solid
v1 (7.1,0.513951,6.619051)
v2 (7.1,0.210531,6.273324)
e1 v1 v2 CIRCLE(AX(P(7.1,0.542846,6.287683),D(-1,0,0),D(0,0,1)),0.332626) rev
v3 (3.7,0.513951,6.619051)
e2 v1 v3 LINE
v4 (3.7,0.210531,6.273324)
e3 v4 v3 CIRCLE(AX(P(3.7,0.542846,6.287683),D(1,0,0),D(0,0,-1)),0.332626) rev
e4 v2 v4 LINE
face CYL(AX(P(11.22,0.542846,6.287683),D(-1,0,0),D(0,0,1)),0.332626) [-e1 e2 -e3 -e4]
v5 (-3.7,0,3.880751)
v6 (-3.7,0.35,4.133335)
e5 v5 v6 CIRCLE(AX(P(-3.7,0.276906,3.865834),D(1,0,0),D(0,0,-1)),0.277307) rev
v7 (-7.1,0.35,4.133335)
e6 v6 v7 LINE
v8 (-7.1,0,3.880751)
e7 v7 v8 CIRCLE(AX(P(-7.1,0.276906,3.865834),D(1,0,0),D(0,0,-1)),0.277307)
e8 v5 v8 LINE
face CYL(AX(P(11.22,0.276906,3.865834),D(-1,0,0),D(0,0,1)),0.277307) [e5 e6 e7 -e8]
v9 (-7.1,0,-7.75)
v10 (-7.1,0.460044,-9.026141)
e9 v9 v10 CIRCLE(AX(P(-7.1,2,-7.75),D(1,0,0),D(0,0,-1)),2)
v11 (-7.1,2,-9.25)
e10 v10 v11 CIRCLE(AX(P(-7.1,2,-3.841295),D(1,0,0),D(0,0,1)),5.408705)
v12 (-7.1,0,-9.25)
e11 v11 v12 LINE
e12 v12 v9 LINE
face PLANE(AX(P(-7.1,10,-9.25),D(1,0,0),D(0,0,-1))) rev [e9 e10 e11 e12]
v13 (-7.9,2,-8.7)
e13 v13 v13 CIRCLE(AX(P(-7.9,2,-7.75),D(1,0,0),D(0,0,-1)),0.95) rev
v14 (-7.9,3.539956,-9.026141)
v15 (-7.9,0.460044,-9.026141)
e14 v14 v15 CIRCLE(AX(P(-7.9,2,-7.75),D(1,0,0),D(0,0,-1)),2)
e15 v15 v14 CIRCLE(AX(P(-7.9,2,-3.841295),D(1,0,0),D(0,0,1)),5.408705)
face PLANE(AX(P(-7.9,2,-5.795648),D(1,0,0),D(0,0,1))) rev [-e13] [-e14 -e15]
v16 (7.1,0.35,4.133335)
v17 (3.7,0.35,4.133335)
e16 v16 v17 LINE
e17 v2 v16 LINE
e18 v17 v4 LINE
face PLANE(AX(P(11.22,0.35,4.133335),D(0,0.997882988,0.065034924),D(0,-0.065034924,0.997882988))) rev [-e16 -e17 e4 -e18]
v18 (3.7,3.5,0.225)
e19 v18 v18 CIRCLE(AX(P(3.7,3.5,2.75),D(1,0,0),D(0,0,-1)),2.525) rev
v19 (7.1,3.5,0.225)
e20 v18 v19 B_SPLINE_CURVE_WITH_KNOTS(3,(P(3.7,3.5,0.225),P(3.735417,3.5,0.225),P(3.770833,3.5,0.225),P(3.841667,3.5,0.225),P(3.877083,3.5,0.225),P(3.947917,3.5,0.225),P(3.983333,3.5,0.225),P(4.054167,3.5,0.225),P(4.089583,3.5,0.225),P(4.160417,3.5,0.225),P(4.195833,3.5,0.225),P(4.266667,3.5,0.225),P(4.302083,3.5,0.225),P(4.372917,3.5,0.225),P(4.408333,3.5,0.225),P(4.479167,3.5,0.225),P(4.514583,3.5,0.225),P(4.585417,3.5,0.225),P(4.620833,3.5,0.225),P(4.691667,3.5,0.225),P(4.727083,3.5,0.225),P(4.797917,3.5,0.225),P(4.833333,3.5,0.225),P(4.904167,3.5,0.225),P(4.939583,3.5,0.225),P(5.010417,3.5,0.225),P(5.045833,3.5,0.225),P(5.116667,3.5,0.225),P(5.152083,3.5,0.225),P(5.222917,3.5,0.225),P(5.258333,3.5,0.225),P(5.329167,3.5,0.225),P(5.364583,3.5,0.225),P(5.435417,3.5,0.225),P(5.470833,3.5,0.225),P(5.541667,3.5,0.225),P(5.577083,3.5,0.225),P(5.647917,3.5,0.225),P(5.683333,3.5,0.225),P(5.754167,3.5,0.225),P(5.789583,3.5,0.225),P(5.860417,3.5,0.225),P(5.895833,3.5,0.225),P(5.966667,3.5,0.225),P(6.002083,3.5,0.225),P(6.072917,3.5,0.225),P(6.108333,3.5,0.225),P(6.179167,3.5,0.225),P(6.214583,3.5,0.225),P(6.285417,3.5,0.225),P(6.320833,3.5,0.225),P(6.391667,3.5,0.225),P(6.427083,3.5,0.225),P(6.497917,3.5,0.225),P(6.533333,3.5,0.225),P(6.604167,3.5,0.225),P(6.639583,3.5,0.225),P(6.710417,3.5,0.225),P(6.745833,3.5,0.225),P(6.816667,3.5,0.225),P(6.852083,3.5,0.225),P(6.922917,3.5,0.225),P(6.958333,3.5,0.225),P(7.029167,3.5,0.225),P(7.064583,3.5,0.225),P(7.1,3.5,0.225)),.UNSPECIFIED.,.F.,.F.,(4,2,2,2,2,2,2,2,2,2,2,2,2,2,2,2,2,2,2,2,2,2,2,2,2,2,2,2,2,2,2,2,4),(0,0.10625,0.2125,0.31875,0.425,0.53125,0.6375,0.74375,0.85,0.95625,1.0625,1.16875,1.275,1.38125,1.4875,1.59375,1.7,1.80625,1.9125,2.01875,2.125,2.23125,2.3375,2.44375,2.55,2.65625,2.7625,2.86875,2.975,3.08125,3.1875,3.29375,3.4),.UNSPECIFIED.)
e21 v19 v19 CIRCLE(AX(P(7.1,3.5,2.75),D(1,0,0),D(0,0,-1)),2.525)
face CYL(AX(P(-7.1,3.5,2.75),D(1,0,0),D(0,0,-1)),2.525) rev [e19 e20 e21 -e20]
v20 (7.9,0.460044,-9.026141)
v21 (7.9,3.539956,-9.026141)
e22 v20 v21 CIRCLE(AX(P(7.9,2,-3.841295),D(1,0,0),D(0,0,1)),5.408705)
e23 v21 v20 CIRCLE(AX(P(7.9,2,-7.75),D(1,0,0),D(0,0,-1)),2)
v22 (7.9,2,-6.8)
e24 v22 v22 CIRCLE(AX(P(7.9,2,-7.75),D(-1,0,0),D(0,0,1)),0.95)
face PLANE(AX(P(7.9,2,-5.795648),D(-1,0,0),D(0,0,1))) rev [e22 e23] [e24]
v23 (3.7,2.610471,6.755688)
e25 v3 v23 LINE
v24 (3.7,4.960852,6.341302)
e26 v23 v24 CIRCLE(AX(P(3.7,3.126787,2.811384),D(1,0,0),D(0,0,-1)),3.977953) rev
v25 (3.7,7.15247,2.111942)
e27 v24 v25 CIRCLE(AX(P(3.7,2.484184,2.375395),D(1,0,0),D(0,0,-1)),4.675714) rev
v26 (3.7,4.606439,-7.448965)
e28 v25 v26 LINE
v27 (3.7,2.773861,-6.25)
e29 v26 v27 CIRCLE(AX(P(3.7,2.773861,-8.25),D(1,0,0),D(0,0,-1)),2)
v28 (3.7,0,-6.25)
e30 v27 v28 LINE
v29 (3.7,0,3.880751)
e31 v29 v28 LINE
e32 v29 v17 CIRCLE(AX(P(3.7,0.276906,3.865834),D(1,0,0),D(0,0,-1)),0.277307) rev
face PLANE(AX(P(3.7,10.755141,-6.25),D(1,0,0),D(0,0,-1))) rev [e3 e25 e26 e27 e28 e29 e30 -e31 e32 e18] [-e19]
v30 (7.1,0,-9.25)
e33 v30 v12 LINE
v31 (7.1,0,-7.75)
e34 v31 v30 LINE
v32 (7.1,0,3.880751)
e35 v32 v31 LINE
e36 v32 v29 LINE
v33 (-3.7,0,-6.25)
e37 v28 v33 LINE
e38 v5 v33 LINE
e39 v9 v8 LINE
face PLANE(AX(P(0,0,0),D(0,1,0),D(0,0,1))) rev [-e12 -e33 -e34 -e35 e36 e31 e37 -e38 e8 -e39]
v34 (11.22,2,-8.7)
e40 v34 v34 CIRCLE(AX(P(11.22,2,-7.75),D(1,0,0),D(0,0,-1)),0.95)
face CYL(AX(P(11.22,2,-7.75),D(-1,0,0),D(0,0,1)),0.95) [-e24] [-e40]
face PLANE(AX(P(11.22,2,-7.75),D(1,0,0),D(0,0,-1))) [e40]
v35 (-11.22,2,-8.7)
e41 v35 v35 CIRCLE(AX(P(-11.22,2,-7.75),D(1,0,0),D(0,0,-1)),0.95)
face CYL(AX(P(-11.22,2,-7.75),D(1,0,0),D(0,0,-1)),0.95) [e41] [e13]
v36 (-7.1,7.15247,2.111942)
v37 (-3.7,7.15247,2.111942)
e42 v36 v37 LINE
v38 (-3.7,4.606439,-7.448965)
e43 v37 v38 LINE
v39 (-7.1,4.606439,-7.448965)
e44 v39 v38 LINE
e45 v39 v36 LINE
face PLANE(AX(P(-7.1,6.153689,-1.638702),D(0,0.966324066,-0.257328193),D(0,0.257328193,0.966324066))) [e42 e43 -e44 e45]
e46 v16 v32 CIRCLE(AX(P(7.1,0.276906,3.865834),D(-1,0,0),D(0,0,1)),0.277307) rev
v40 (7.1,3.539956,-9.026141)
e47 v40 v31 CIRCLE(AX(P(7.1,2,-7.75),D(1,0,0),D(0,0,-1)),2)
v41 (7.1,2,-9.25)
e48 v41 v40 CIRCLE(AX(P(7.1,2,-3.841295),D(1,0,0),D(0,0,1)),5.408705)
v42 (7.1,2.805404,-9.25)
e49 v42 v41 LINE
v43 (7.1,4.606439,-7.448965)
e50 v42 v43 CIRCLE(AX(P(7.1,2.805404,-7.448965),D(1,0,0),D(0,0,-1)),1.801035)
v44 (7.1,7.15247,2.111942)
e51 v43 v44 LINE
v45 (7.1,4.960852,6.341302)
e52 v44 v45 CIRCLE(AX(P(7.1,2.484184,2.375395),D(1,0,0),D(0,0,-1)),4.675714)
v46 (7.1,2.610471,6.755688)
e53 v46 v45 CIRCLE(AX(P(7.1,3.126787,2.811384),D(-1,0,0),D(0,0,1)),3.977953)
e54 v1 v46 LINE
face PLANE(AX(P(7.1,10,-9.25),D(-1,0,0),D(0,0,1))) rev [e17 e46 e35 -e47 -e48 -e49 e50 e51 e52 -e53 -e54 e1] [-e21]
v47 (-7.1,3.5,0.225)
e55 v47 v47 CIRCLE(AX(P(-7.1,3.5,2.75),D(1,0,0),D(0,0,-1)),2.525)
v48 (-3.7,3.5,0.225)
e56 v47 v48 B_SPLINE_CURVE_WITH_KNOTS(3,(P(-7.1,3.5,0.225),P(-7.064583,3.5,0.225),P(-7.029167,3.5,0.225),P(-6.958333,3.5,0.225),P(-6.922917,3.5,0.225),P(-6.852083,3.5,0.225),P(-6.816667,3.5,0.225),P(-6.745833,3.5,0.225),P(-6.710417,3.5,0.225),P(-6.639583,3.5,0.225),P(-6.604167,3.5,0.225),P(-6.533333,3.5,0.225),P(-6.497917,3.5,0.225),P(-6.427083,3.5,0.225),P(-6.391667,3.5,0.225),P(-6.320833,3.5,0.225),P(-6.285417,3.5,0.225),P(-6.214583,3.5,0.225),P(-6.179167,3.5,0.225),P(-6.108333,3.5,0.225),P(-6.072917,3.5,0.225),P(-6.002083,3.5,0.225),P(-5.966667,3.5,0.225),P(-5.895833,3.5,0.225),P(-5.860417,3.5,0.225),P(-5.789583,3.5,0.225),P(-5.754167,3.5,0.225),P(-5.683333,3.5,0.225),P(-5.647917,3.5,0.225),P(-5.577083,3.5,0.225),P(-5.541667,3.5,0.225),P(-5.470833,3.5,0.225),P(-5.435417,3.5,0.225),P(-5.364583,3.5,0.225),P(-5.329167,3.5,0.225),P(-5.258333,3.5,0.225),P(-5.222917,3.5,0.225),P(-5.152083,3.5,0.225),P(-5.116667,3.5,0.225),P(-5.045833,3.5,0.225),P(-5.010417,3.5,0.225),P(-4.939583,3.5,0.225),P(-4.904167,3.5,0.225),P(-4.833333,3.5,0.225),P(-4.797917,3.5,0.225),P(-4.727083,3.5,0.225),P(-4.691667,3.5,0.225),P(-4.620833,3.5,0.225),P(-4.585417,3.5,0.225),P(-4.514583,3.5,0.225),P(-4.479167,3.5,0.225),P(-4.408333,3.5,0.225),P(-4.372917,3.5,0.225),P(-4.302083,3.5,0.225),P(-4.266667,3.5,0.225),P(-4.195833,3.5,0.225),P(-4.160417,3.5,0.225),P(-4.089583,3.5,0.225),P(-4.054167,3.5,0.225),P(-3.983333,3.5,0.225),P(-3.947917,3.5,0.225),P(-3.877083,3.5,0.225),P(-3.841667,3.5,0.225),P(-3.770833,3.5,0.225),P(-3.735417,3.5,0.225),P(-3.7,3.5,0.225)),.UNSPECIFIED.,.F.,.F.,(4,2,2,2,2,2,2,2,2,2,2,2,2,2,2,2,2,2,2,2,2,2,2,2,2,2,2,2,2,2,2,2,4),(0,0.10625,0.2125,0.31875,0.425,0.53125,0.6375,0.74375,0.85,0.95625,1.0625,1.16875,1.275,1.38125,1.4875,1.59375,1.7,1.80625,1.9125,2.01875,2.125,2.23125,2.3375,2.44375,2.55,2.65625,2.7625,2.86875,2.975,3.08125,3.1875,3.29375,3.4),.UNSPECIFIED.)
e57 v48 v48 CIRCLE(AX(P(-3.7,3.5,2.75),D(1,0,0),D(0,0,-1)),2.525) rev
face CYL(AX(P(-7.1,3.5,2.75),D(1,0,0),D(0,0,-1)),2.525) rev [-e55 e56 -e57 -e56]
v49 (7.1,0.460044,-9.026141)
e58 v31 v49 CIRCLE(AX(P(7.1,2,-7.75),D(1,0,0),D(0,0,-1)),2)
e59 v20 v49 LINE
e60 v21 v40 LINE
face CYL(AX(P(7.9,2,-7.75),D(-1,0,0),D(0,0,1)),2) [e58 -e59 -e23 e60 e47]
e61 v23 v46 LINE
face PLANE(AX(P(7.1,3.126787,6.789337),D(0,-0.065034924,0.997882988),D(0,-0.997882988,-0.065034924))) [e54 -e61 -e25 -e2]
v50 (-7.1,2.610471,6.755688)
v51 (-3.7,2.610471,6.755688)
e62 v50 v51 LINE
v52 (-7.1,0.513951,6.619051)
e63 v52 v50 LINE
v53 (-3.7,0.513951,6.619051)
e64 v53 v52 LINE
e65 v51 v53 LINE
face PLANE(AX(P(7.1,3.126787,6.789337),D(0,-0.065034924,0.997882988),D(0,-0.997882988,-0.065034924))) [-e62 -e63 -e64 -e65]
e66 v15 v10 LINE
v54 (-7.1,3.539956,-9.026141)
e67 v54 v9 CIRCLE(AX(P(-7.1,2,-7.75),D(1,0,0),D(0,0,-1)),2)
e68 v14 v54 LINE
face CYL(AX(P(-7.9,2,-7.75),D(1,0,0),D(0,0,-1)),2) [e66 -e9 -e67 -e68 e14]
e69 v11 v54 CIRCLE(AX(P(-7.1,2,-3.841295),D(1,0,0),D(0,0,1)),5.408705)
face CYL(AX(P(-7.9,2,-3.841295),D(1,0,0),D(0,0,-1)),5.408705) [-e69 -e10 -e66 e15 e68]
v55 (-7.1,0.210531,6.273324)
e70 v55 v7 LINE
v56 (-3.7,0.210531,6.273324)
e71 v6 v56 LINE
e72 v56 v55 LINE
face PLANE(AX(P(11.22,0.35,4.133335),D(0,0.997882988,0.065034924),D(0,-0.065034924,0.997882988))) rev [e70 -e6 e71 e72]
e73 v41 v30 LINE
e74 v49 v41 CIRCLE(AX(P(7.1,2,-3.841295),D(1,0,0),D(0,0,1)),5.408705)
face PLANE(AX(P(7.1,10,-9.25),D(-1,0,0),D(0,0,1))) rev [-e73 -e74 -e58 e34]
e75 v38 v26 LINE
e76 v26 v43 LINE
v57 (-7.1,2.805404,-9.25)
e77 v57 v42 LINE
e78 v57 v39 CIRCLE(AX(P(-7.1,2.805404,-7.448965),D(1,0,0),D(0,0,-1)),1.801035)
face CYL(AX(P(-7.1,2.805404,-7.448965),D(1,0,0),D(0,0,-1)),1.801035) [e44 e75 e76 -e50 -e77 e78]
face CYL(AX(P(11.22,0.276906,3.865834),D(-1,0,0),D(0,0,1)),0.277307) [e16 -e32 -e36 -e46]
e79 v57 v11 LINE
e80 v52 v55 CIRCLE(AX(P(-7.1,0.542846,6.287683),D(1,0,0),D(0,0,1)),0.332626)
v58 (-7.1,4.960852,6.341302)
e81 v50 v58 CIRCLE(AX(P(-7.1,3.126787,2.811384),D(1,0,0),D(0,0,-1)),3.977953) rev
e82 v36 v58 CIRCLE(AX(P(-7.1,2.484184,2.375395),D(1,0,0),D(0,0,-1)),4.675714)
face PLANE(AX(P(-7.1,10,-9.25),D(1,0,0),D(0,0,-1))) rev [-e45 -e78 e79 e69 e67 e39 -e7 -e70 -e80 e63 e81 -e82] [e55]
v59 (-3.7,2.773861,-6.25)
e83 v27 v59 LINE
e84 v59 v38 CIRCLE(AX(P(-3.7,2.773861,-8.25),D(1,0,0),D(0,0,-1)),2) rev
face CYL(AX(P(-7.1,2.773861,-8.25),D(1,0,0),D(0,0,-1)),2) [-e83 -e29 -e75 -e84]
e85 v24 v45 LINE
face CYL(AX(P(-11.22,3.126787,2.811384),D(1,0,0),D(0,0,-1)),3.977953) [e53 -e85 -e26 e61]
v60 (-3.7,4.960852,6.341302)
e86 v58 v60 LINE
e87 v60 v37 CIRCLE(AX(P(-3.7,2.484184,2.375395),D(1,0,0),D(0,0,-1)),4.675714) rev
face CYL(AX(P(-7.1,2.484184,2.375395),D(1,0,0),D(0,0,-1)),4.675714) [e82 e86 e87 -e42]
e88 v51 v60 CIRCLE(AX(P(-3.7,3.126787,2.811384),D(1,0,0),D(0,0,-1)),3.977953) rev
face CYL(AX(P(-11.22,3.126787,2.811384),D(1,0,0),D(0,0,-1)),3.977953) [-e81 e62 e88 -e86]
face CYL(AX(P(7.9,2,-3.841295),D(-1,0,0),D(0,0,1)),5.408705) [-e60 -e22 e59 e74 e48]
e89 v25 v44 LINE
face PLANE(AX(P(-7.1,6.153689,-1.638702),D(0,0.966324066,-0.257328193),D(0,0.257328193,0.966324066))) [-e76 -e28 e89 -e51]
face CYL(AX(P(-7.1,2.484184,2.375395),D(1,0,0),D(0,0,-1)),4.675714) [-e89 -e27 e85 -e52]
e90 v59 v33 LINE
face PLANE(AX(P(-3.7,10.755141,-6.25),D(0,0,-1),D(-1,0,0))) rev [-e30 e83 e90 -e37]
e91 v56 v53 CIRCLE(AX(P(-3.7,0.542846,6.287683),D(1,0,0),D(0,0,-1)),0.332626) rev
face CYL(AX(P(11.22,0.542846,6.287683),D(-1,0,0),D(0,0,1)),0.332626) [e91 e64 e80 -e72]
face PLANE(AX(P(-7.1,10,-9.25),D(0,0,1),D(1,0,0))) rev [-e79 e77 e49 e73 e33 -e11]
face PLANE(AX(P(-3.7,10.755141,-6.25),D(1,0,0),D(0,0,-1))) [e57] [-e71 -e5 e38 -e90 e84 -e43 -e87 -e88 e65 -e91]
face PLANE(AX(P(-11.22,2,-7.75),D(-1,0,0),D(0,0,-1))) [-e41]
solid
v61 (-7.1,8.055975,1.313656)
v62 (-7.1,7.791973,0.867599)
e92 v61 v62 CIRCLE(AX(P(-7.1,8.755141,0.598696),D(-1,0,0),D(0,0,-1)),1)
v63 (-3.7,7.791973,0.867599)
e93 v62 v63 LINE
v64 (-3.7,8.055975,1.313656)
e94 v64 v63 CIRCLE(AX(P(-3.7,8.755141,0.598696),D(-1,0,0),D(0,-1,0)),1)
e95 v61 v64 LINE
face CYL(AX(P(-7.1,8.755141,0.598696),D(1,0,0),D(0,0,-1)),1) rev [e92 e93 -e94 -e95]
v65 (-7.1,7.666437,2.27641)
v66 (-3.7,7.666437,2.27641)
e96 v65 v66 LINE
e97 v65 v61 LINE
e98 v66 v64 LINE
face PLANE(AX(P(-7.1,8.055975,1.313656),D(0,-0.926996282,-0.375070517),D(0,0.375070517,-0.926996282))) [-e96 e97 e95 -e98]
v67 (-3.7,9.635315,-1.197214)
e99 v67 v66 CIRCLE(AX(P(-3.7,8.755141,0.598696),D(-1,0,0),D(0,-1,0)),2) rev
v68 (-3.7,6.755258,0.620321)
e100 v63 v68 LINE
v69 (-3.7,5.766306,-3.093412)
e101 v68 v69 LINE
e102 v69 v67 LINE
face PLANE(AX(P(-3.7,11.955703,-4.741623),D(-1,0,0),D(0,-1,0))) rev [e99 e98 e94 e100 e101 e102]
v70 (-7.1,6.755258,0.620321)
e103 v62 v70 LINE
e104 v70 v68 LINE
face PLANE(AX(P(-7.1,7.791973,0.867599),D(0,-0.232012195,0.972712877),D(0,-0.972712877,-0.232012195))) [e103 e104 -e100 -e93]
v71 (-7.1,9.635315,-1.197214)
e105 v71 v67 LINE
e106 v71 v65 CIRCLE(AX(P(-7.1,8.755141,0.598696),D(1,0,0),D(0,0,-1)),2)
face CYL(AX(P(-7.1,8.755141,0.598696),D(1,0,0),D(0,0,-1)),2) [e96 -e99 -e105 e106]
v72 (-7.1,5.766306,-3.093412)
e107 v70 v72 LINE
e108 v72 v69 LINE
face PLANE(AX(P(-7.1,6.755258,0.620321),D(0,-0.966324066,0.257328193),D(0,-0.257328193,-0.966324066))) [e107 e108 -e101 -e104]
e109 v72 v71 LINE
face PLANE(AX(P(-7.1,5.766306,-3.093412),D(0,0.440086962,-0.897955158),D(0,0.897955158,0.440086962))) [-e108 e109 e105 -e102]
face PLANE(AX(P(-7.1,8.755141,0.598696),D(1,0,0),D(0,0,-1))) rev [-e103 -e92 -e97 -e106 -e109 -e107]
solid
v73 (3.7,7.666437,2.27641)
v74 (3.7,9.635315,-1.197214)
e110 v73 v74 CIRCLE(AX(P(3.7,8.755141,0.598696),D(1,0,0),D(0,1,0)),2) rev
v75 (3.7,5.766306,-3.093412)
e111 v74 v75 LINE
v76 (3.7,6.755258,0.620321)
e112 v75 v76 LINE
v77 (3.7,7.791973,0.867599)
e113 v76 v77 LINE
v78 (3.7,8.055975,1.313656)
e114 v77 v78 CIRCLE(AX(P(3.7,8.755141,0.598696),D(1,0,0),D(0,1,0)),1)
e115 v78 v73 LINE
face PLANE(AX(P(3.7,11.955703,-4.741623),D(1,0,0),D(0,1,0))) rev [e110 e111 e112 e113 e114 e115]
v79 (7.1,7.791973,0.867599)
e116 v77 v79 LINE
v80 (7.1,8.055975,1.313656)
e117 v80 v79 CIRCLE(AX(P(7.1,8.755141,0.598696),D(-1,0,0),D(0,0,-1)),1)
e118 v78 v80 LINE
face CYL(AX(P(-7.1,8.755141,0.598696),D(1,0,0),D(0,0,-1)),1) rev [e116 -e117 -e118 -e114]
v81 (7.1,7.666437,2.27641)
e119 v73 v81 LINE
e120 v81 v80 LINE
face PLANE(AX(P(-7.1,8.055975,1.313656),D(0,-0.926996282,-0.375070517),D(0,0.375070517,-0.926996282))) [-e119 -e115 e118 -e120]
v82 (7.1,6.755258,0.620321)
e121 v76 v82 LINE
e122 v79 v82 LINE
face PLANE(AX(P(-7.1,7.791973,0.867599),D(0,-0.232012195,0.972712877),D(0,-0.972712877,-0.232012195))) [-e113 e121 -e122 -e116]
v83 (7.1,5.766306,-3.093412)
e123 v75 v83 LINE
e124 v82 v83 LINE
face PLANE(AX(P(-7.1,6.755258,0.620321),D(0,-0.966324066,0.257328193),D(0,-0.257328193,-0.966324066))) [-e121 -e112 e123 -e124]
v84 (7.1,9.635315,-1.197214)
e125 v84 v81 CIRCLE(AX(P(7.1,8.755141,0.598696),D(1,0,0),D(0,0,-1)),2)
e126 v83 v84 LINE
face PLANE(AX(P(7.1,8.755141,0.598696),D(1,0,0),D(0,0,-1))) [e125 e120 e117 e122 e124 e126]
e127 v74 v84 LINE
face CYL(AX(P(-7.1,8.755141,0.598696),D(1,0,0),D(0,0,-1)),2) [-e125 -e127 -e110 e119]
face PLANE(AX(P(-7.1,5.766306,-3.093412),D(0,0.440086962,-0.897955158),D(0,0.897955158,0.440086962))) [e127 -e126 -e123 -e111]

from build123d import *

# Parameters (mm, degrees)
SKETCH_3_W               = 14.2
SKETCH_3_H               = 18.5
EXTRUDE_1_DEPTH          = 10
SKETCH_5_R               = 2.525
CUT_EXTRUDE_3_DEPTH      = 20.677461727
SKETCH_5_6_R             = 0.95
EXTRUDE_2_DEPTH          = 4.12
EXTRUDE_3_DEPTH          = 14.2
CUT_EXTRUDE_6_DEPTH      = 19.086568265
CUT_EXTRUDE_6_DEPTH_BACK = 19.086568265
SKETCH_14_W              = 7.4
SKETCH_14_H              = 15.203667289
EXTRUDE_4_DEPTH          = 0.8
FILLET_1_R               = 2
CUT_EXTRUDE_16_DEPTH     = 24.17019533
SKETCH_31_W              = 7.4
SKETCH_31_H              = 10.622526497
CUT_EXTRUDE_17_DEPTH     = 16.468325908
CUT_EXTRUDE_19_DEPTH     = 24.17019533
EXTRUDE_7_DEPTH          = 14.2
SKETCH_36_W              = 7.4
SKETCH_36_H              = 2.688606207
CUT_EXTRUDE_20_DEPTH     = 18.747756854
CUT_EXTRUDE_21_DEPTH     = 24.17019533


with BuildPart() as part:
    # 草图3 → 凸台-拉伸1 (new body)
    with BuildSketch(Plane(origin=(0, 0, 0), x_dir=(1, 0, 0), z_dir=(0, 1, 0))):
        Rectangle(SKETCH_3_W, SKETCH_3_H)
    extrude(amount=EXTRUDE_1_DEPTH)

    # 草图5 → 切除-拉伸3 (cut, through all)
    with BuildSketch(Plane(origin=(7.1, 0, 0), x_dir=(0, 0, -1), z_dir=(1, 0, 0))):
        with BuildLine():
            Line((-9.25, 10), (-9.25, 0))
            Line((-9.25, 0), (-6.336598232, 0))
            ThreePointArc((-6.336598232, 0), (-6.401285502, 4.862104509), (-2.111941752, 7.152470177))
            Line((-2.111941752, 7.152470177), (0.590375146, 6.432854109))
            Line((0.590375146, 6.432854109), (7.448964751, 4.606439417))
            ThreePointArc((7.448964751, 4.606439417), (8.722488989, 4.078928406), (9.25, 2.805404168))
            Line((9.25, 2.805404168), (9.25, 10))
            Line((9.25, 10), (-9.25, 10))
        make_face()
        with Locations((-2.75, 3.5)):
            Circle(SKETCH_5_R)
    extrude(amount=-CUT_EXTRUDE_3_DEPTH, mode=Mode.SUBTRACT)

    # 草图5<6> → 凸台-拉伸2 (add)
    with BuildSketch(Plane(origin=(7.1, 0, 0), x_dir=(0, 0, -1), z_dir=(1, 0, 0))):
        with Locations(Location((7.75, 2, 0), (0, 0, 180))):
            Circle(SKETCH_5_6_R)
    extrude_2 = extrude(amount=EXTRUDE_2_DEPTH)

    # 镜向1: 凸台-拉伸2 across plane
    add(extrude_2.mirror(Plane(origin=(0, 0, 0), x_dir=(0, 0, 1), z_dir=(1, 0, 0))))

    # 草图14 → 切除-拉伸6 (cut, two sides: drawn at the far end of the back side and taken through both)
    with BuildSketch(Plane.XZ.offset(-CUT_EXTRUDE_6_DEPTH_BACK)):
        with Locations((0, 1.351833645)):
            Rectangle(SKETCH_14_W, SKETCH_14_H)
    extrude(amount=CUT_EXTRUDE_6_DEPTH + CUT_EXTRUDE_6_DEPTH_BACK, mode=Mode.SUBTRACT)

    # 草图20 → 凸台-拉伸4 (add)
    with BuildSketch(Plane(origin=(7.1, 0, 0), x_dir=(0, 0, -1), z_dir=(1, 0, 0))):
        with BuildLine():
            ThreePointArc((9.02614068, 3.539956157), (5.75, 2), (9.02614068, 0.460043843))
            ThreePointArc((9.02614068, 0.460043843), (9.25, 2), (9.02614068, 3.539956157))
        make_face()
    extrude_4 = extrude(amount=EXTRUDE_4_DEPTH)

    # 镜向2: 凸台-拉伸4 across plane
    add(extrude_4.mirror(Plane(origin=(0, 0, 0), x_dir=(0, 0, 1), z_dir=(1, 0, 0))))

    # 圆角1
    # the kernel refuses this fillet: 2 mm, written as the material it takes off along each edge
    with BuildSketch(Plane(origin=(3.7, 4.925718884, -6.25), x_dir=(0, -1, 0), z_dir=(-1, 0, 0))) as fillet_1_piece_1:
        with BuildLine():
            CenterArc((2.151857578, -2), FILLET_1_R, 90, 66.389458329)
            Line((0.319279467, -1.198964751), (0.282627905, -1.182944046))
            ThreePointArc((0.282627905, -1.182944046), (0.120986771, -0.609775503), (-0.038652963, -0.010293128))
            Line((-0.038652963, -0.010293128), (0, 0.04))
            Line((0, 0.04), (2.151857578, 0.04))
            Line((2.151857578, 0.04), (2.151857578, 0))
        make_face()
    extrude(amount=7.4, mode=Mode.SUBTRACT)

    # 草图28 → 切除-拉伸16 (cut, through all)
    with BuildSketch(Plane.ZY.offset(7.1)):
        with BuildLine():
            Line((4.133334805, 0.35), (6.998120333, 0.163293632))
            Line((6.998120333, 0.163293632), (6.998120333, 0))
            Line((6.998120333, 0), (3.880750582, 0))
            ThreePointArc((3.880750582, 0), (4.090700414, 0.114626799), (4.133334805, 0.35))
        make_face()
    extrude(amount=-CUT_EXTRUDE_16_DEPTH, mode=Mode.SUBTRACT)

    # 草图33 → 切除-拉伸19 (cut, through all)
    with BuildSketch(Plane(origin=(7.1, 0, 0), x_dir=(0, 0, -1), z_dir=(1, 0, 0))):
        with BuildLine():
            Line((-6.341301644, 4.960852087), (-7.680928531, 4.960852087))
            Line((-7.680928531, 4.960852087), (-7.680928531, 0))
            Line((-7.680928531, 0), (-5.565727569, 0.256646816))
            ThreePointArc((-5.565727569, 0.256646816), (-6.736351761, 2.479684462), (-6.341301644, 4.960852087))
        make_face()
    extrude(amount=-CUT_EXTRUDE_19_DEPTH, mode=Mode.SUBTRACT)

    # 草图35 → 凸台-拉伸7 (add)
    with BuildSketch(Plane.ZY.offset(7.1)):
        Polygon((6.59789795, 0.189377283), (5.565727569, 0.256646816), (6.789337446, 3.126786976), align=None)
    extrude(amount=-EXTRUDE_7_DEPTH)

    # 草图36 → 切除-拉伸20 (cut, through all)
    with BuildSketch(Plane(origin=(0, 0.616761699, 0.040196146), x_dir=(1, 0, 0), z_dir=(0, -0.9978829884707797, -0.06503492385346464))):
        with Locations((0, 6.881556957)):
            Rectangle(SKETCH_36_W, SKETCH_36_H)
    extrude(amount=-CUT_EXTRUDE_20_DEPTH, mode=Mode.SUBTRACT)

    # 草图38 → 切除-拉伸21 (cut, through all)
    with BuildSketch(Plane.ZY.offset(7.1)):
        with BuildLine():
            Line((6.59789795, 0.189377283), (6.273324357, 0.210530684))
            ThreePointArc((6.273324357, 0.210530684), (6.512512605, 0.297710559), (6.619998756, 0.528487672))
            Line((6.619998756, 0.528487672), (6.679795922, 0.184039755))
            Line((6.679795922, 0.184039755), (6.59789795, 0.189377283))
        make_face()
    extrude(amount=-CUT_EXTRUDE_21_DEPTH, mode=Mode.SUBTRACT)


with BuildPart() as body_2:
    # 草图17 → 凸台-拉伸3 (new body)
    with BuildSketch(Plane(origin=(7.1, 0, 0), x_dir=(0, 0, -1), z_dir=(1, 0, 0))):
        with BuildLine():
            Line((-0.62032107, 6.755257618), (0.092613665, 6.565405979))
            Line((0.092613665, 6.565405979), (3.093411655, 5.766305603))
            Line((3.093411655, 5.766305603), (1.197214038, 9.635314631))
            ThreePointArc((1.197214038, 9.635314631), (-1.584907581, 10.495079575), (-2.276410042, 7.666436649))
            Line((-2.276410042, 7.666436649), (-1.313655995, 8.055975059))
            ThreePointArc((-1.313655995, 8.055975059), (-0.08936271, 9.615709888), (-0.867599297, 7.791973449))
            Line((-0.867599297, 7.791973449), (-0.62032107, 6.755257618))
        make_face()
    extrude(amount=-EXTRUDE_3_DEPTH)

    # 草图31 → 切除-拉伸17 (cut, through all)
    with BuildSketch(Plane(origin=(0, 6.153688784, -1.638702452), x_dir=(1, 0, 0), z_dir=(0, -0.9663240662123234, 0.2573281932841431))):
        with Locations((0, 3.805858122)):
            Rectangle(SKETCH_31_W, SKETCH_31_H)
    extrude(amount=-CUT_EXTRUDE_17_DEPTH, mode=Mode.SUBTRACT)


with BuildPart() as cut_extrude_17_piece_1:
    # of the separate pieces the step leaves, piece 1, a body of its own (cut_extrude_17_pieces)
    add(body_2.part.solids().sort_by_distance((7.1, 7.666436649, 2.276410042))[0])


with BuildPart() as cut_extrude_17_piece_2:
    # of the separate pieces the step leaves, piece 2, a body of its own (cut_extrude_17_pieces)
    add(body_2.part.solids().sort_by_distance((-3.7, 7.666436649, 2.276410042))[0])


solid = Compound([part.part, cut_extrude_17_piece_1.part, cut_extrude_17_piece_2.part])
